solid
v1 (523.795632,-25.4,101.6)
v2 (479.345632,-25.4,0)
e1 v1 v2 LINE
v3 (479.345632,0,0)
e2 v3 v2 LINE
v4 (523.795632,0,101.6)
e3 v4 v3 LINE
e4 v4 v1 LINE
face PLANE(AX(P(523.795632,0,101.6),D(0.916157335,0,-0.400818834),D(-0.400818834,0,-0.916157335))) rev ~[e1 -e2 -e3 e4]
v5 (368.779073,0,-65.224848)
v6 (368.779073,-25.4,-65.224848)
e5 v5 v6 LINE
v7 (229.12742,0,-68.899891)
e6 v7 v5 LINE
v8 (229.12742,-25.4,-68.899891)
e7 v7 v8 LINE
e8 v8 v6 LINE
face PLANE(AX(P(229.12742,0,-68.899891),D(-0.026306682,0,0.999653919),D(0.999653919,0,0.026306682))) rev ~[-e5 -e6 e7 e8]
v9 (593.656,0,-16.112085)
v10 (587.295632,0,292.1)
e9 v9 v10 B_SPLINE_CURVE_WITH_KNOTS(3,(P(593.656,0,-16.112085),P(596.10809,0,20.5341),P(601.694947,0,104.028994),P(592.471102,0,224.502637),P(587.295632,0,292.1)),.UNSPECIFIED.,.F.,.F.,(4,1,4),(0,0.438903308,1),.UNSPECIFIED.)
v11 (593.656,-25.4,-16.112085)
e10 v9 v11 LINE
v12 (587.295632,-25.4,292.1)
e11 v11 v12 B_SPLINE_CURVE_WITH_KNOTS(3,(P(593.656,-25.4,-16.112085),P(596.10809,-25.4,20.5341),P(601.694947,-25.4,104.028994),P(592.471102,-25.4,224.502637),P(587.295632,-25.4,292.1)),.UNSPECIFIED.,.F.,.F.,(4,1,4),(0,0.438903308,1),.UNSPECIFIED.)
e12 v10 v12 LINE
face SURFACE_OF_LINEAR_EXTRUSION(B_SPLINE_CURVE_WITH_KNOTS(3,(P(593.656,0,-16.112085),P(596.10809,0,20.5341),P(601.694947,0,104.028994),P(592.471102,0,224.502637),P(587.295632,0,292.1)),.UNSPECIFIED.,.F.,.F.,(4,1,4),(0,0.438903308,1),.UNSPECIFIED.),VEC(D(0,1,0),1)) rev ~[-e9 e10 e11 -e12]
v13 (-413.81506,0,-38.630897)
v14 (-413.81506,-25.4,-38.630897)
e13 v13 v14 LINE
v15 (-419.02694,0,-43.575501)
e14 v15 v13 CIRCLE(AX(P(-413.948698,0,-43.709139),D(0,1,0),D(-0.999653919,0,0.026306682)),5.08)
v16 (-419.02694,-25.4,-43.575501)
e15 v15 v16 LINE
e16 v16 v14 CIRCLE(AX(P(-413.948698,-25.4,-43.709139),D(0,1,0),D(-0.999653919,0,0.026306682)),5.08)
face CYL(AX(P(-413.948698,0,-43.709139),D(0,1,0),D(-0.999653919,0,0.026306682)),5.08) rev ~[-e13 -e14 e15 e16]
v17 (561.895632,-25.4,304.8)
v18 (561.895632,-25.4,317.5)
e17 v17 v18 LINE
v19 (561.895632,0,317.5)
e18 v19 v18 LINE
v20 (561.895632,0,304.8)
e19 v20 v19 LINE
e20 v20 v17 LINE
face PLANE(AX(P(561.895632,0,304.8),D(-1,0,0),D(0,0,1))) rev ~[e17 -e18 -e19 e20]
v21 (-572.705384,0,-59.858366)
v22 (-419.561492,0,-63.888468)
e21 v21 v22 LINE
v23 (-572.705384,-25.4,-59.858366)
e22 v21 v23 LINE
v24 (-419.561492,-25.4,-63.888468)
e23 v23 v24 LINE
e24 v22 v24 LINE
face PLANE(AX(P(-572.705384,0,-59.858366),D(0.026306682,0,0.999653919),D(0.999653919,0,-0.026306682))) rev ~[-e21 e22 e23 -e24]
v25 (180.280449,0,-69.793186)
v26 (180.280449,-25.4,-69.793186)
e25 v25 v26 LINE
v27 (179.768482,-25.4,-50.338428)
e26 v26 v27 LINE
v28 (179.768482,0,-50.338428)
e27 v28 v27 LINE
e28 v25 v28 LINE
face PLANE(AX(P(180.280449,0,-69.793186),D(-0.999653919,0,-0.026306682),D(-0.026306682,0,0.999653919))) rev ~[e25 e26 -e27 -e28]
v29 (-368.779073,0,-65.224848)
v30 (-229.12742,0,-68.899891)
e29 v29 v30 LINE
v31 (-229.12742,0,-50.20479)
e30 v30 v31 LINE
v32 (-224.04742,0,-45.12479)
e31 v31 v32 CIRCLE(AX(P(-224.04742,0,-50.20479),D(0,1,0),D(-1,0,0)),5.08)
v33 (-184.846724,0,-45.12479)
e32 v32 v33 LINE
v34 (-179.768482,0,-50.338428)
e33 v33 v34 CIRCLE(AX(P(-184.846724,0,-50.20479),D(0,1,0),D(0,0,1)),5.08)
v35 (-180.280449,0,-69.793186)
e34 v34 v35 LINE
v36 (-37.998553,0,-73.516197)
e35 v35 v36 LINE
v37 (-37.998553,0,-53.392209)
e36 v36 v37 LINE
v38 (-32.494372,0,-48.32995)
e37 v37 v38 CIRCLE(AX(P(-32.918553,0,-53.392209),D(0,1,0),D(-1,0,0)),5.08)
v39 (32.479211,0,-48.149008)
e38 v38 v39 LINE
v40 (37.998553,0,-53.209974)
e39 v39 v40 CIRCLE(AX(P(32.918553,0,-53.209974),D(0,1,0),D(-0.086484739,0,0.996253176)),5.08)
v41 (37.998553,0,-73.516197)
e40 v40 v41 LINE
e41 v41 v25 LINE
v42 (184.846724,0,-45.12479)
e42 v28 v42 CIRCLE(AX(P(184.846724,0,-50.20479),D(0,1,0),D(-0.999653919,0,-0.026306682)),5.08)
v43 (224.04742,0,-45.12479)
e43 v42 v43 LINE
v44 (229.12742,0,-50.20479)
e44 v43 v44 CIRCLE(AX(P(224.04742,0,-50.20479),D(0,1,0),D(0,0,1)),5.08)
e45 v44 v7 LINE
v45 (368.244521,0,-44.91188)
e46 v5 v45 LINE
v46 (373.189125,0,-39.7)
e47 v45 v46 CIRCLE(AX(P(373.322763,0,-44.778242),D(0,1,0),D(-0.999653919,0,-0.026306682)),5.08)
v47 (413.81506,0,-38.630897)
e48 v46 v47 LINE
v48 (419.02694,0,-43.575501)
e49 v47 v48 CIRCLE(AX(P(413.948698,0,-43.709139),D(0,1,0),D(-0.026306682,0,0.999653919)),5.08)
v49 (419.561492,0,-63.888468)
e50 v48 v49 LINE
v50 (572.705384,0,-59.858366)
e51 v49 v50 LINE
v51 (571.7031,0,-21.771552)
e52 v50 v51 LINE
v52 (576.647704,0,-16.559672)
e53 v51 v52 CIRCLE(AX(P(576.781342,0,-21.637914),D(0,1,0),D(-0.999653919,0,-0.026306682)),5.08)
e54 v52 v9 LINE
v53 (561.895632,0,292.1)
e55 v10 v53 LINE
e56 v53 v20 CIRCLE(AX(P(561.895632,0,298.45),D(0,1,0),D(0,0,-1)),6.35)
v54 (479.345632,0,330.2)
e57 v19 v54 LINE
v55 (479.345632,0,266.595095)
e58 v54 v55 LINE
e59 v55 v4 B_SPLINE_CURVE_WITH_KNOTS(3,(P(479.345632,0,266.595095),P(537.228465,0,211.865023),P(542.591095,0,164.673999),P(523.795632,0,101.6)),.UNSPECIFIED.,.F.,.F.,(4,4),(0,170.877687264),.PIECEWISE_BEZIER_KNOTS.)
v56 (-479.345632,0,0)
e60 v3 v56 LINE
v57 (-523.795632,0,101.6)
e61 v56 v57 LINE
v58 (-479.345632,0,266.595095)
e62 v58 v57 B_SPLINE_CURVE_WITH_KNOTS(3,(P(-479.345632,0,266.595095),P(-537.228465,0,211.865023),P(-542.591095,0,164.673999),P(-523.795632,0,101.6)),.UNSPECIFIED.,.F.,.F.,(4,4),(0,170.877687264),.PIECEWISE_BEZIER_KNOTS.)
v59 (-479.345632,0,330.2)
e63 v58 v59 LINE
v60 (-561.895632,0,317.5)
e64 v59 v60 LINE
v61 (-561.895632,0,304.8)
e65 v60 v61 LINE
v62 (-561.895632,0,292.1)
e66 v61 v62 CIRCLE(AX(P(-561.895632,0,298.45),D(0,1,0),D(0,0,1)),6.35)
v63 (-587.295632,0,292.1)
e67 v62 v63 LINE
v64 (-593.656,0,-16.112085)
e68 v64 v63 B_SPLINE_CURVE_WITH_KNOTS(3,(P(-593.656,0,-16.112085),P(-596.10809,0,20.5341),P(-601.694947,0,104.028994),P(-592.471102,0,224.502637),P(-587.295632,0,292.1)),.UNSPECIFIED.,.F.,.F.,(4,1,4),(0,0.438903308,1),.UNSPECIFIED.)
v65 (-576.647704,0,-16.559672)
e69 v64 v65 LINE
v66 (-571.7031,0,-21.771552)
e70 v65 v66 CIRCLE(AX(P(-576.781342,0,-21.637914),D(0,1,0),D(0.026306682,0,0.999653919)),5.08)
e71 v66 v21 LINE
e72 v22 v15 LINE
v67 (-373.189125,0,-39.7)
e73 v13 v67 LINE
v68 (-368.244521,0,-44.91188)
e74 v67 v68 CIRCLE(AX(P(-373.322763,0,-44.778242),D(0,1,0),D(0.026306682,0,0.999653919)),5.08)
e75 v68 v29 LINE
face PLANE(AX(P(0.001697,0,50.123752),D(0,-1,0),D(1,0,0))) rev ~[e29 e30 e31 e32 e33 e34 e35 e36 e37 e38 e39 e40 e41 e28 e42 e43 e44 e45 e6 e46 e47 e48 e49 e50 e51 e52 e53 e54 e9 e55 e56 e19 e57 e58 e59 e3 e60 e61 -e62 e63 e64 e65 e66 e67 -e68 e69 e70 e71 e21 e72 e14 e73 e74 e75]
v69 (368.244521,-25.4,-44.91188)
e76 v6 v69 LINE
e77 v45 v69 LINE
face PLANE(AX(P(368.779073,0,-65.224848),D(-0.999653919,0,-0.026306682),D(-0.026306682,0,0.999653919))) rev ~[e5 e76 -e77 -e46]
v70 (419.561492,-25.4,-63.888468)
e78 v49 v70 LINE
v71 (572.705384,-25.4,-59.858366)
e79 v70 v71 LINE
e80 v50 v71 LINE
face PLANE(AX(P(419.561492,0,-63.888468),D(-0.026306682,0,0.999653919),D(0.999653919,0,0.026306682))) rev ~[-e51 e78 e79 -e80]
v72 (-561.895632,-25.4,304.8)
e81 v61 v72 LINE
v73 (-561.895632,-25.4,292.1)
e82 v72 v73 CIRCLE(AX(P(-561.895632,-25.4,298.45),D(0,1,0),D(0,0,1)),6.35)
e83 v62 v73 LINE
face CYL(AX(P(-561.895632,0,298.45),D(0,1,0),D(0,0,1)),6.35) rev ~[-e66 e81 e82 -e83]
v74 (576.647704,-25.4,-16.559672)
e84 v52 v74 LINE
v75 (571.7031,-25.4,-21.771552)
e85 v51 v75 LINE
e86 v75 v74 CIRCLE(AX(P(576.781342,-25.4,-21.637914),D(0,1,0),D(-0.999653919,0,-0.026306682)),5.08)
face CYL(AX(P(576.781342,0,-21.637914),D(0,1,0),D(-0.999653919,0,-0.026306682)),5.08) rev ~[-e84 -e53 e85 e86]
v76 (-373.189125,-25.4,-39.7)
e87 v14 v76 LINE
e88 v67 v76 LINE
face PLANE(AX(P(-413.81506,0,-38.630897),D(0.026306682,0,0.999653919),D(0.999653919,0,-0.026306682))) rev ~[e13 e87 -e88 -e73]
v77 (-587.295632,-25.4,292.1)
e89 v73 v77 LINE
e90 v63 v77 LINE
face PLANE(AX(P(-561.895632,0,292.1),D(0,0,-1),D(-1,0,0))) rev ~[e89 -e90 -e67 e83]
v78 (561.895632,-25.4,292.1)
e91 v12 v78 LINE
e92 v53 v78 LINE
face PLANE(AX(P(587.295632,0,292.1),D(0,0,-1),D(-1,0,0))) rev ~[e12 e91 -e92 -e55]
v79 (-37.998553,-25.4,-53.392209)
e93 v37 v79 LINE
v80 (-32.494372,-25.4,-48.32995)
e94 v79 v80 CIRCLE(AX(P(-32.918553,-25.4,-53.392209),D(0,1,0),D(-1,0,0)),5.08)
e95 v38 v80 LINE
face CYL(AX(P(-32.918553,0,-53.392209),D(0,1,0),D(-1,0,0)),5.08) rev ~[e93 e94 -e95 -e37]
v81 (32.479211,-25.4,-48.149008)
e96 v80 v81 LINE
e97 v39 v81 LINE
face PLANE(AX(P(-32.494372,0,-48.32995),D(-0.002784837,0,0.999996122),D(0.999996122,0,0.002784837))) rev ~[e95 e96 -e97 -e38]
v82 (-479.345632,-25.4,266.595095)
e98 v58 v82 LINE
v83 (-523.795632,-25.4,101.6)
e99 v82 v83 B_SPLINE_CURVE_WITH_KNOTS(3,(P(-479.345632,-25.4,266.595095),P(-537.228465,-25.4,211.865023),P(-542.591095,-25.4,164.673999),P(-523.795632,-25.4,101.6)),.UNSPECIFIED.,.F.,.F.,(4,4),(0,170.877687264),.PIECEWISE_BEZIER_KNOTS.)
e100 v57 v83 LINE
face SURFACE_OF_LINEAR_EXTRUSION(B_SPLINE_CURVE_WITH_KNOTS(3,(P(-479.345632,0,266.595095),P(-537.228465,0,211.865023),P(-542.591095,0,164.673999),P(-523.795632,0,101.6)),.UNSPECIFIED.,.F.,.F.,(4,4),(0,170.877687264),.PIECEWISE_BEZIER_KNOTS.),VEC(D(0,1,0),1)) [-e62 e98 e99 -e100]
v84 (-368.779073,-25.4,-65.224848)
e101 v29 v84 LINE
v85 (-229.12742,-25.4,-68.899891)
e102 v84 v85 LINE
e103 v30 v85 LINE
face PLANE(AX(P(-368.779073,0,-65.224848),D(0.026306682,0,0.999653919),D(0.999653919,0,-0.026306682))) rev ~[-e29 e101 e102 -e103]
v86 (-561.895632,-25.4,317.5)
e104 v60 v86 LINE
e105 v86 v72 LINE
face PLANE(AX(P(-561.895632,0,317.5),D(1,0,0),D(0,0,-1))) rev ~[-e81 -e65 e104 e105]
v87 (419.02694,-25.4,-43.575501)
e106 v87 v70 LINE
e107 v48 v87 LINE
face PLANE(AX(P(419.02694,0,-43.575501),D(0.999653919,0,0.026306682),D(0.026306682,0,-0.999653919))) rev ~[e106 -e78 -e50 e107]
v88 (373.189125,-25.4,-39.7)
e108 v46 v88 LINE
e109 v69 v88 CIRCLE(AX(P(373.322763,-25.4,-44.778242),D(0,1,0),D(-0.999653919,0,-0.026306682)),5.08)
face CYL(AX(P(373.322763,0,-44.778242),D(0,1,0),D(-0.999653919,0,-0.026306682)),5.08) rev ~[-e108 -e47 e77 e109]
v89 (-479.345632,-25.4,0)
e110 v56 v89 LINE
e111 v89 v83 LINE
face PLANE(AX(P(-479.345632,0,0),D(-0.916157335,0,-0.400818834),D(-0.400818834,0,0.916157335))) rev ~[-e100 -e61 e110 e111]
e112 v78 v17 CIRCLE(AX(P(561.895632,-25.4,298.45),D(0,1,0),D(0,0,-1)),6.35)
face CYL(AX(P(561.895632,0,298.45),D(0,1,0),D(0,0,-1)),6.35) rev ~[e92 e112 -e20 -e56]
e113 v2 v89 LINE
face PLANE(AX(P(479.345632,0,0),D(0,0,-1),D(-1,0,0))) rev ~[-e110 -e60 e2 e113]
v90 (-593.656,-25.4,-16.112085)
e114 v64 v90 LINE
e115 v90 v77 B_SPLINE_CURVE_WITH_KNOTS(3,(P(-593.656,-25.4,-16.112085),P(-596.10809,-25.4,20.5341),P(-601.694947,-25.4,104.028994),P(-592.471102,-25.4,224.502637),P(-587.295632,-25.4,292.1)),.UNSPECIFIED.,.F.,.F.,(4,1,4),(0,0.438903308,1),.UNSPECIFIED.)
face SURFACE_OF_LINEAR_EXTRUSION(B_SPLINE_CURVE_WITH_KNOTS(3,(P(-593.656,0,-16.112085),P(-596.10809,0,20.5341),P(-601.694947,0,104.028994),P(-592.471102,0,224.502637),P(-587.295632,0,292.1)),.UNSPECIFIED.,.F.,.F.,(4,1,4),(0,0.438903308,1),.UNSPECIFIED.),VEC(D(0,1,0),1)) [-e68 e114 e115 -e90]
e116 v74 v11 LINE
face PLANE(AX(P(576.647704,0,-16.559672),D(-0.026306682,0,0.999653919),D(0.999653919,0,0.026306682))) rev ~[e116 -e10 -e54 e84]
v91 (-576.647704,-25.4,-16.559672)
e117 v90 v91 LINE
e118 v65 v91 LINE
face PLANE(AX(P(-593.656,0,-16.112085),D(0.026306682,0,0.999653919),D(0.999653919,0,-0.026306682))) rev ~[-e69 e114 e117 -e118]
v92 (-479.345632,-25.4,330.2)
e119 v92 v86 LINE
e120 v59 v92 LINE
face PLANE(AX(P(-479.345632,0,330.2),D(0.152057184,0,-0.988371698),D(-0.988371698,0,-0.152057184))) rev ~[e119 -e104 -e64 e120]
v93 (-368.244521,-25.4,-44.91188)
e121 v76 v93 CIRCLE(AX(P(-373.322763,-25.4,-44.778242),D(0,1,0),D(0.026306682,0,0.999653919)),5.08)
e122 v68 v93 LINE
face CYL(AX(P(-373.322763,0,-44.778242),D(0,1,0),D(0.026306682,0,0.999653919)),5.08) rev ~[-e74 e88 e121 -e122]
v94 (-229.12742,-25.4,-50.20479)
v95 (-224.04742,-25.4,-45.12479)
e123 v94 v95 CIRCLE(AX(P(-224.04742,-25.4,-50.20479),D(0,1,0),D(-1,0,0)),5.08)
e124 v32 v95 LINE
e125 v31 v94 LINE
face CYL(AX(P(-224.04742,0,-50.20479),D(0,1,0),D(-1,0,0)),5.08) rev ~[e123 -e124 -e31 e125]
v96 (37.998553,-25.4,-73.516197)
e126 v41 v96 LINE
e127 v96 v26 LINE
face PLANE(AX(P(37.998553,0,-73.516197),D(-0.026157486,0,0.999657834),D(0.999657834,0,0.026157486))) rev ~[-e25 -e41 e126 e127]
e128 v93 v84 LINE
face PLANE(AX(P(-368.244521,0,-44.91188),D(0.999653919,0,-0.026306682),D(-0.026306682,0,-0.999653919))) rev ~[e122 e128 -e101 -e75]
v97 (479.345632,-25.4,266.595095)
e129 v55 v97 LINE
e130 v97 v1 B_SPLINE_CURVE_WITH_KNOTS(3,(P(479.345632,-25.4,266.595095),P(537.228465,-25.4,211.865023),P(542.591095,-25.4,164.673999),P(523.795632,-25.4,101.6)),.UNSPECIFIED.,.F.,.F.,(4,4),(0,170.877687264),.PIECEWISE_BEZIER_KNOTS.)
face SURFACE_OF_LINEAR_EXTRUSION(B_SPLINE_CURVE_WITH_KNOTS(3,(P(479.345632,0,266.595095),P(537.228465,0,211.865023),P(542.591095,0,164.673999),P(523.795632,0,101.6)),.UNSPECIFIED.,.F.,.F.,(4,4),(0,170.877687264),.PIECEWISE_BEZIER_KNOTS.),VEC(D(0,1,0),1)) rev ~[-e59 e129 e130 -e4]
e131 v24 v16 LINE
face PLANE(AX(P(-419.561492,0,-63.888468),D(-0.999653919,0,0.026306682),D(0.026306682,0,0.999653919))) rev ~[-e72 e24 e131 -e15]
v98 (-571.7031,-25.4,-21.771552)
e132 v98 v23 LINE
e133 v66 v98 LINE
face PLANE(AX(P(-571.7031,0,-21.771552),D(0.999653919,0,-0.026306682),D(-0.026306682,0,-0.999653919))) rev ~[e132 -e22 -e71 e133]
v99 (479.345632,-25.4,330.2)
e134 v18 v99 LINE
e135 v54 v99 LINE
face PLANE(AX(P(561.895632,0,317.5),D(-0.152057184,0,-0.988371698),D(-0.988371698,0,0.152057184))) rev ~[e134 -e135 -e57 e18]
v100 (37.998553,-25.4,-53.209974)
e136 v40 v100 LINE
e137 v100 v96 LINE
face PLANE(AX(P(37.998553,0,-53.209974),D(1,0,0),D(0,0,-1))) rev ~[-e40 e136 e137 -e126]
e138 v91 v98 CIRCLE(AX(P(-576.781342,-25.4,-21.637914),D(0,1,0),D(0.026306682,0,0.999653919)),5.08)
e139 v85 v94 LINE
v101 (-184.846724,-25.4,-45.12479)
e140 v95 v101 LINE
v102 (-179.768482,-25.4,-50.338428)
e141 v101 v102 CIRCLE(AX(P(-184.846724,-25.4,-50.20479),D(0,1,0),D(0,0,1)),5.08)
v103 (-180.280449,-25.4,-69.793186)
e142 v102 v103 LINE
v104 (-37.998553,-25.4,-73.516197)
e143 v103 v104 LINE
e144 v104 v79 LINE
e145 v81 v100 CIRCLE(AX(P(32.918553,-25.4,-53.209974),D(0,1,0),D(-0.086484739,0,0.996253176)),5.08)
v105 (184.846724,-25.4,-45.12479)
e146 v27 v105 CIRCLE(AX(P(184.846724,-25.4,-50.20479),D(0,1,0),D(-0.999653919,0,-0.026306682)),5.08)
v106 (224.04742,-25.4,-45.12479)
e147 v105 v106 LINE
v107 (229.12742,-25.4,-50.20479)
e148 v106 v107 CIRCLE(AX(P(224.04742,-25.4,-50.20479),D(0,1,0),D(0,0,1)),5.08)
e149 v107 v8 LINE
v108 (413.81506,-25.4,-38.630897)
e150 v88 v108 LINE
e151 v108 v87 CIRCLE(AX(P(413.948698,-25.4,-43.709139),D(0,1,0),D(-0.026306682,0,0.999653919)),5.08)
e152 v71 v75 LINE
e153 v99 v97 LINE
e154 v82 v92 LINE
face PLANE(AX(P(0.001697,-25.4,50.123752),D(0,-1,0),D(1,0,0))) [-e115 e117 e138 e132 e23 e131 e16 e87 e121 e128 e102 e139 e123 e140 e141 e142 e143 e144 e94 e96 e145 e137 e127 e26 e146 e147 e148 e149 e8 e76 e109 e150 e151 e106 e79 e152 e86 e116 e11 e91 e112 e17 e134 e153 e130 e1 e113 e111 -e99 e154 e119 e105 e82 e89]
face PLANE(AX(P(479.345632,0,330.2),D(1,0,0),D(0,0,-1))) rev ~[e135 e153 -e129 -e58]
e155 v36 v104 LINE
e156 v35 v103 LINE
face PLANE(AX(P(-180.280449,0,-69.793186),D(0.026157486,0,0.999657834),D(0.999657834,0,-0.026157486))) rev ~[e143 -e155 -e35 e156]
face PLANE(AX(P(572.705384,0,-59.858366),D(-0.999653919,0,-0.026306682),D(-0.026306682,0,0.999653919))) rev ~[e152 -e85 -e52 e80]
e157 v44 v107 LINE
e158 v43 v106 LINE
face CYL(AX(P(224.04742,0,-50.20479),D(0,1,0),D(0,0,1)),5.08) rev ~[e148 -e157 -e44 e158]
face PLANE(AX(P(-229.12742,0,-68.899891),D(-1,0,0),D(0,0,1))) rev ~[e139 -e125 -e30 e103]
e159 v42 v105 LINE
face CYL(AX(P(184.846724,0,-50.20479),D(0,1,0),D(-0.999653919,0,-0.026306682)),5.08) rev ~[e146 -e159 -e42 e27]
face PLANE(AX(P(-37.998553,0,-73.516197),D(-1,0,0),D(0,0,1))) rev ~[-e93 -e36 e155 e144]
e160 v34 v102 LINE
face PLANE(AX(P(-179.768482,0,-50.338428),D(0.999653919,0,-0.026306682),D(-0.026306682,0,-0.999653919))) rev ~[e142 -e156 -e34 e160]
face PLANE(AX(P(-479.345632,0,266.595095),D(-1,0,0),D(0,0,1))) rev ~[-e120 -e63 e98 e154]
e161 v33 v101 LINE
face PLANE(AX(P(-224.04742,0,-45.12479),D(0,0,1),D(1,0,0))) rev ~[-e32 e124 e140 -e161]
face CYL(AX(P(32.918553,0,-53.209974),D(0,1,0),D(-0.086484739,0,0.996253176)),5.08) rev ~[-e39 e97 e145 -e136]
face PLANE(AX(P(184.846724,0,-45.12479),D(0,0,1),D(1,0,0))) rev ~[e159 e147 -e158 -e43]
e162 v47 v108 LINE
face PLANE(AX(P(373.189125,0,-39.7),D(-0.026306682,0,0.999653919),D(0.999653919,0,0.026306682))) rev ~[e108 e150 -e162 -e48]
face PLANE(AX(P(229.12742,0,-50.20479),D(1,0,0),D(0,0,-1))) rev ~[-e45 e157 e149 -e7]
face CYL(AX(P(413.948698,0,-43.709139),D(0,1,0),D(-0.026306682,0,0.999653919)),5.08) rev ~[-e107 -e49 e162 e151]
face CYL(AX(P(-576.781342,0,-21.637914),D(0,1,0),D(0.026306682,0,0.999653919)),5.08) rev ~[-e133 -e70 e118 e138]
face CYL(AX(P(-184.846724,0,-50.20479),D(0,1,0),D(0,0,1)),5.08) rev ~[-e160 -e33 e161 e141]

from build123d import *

# Parameters (mm, degrees)
F1_DEPTH = 25.4


with BuildPart() as f1:
    # F0 (on Front) → F1 (new body)
    with BuildSketch(Plane.XZ):
        with BuildLine():
            Line((-180.280449281, -69.793186067), (-37.9985533655, -73.516196597))
            Line((-37.9985533655, -73.516196597), (-37.9985533655, -53.3922091126))
            ThreePointArc((-37.9985533655, -53.3922091126), (-36.3574166334, -49.6531424612), (-32.4943724898, -48.3299496779))
            Line((-32.4943724898, -48.3299496779), (32.4792108915, -48.1490081299))
            ThreePointArc((32.4792108915, -48.1490081299), (36.3518127667, -49.4657614096), (37.9985533655, -53.209974262))
            Line((37.9985533655, -53.209974262), (37.9985533655, -73.516196597))
            Line((37.9985533655, -73.516196597), (180.280449281, -69.793186067))
            Line((180.280449281, -69.793186067), (179.7684819711, -50.3384282921))
            ThreePointArc((179.7684819711, -50.3384282921), (181.2076799987, -46.6602509384), (184.8467238815, -45.124790347))
            Line((184.8467238815, -45.124790347), (224.0474202454, -45.124790347))
            ThreePointArc((224.0474202454, -45.124790347), (227.6395226938, -46.6126878986), (229.1274202454, -50.204790347))
            Line((229.1274202454, -50.204790347), (229.1274202454, -68.8998913716))
            Line((229.1274202454, -68.8998913716), (368.779072779, -65.2248478839))
            Line((368.779072779, -65.2248478839), (368.2445209989, -44.9118802426))
            ThreePointArc((368.2445209989, -44.9118802426), (369.6374073208, -41.2818793035), (373.1891249642, -39.7000003873))
            Line((373.1891249642, -39.7000003873), (413.8150602467, -38.6308968272))
            ThreePointArc((413.8150602467, -38.6308968272), (417.4450611859, -40.0237831491), (419.0269401021, -43.5755007925))
            Line((419.0269401021, -43.5755007925), (419.5614918821, -63.8884684338))
            Line((419.5614918821, -63.8884684338), (572.7053844218, -59.8583659985))
            Line((572.7053844218, -59.8583659985), (571.7030998342, -21.7715516712))
            ThreePointArc((571.7030998342, -21.7715516712), (573.0959861561, -18.141550732), (576.6477037995, -16.5596718159))
            Line((576.6477037995, -16.5596718159), (593.6560001815, -16.112085069))
            add(Edge.make_bspline(
                [(593.6560001815, -16.112085069), (596.1080901801, 20.5341002257), (601.6949471336, 104.0289944805), (592.471101525, 224.502637459), (587.295632267, 292.1)],
                knots=[0, 0, 0, 0, 0.4389033081, 1, 1, 1, 1], degree=3))
            Line((587.295632267, 292.1), (561.895632267, 292.1))
            ThreePointArc((561.895632267, 292.1), (555.545632267, 298.45), (561.895632267, 304.8))
            Line((561.895632267, 304.8), (561.895632267, 317.5))
            Line((561.895632267, 317.5), (479.345632267, 330.2))
            Line((479.345632267, 330.2), (479.345632267, 266.595095396))
            add(Edge.make_bspline(
                [(479.345632267, 266.595095396), (537.2284650803, 211.8650227785), (542.5910949707, 164.6739989519), (523.795632267, 101.6)],
                knots=[0, 0, 0, 0, 170.8776872642, 170.8776872642, 170.8776872642, 170.8776872642], degree=3))
            Line((523.795632267, 101.6), (479.345632267, 0))
            Line((479.345632267, 0), (0, 0))
            Line((0, 0), (-479.345632267, 0))
            Line((-479.345632267, 0), (-523.795632267, 101.6))
            add(Edge.make_bspline(
                [(-479.345632267, 266.595095396), (-537.2284650803, 211.8650227785), (-542.5910949707, 164.6739989519), (-523.795632267, 101.6)],
                knots=[0, 0, 0, 0, 170.8776872642, 170.8776872642, 170.8776872642, 170.8776872642], degree=3))
            Line((-479.345632267, 266.595095396), (-479.345632267, 330.2))
            Line((-479.345632267, 330.2), (-561.895632267, 317.5))
            Line((-561.895632267, 317.5), (-561.895632267, 304.8))
            ThreePointArc((-561.895632267, 304.8), (-555.545632267, 298.45), (-561.895632267, 292.1))
            Line((-561.895632267, 292.1), (-587.295632267, 292.1))
            add(Edge.make_bspline(
                [(-593.6560001815, -16.112085069), (-596.1080901801, 20.5341002257), (-601.6949471336, 104.0289944805), (-592.471101525, 224.502637459), (-587.295632267, 292.1)],
                knots=[0, 0, 0, 0, 0.4389033081, 1, 1, 1, 1], degree=3))
            Line((-593.6560001815, -16.112085069), (-576.6477037995, -16.5596718159))
            ThreePointArc((-576.6477037995, -16.5596718159), (-573.0959861561, -18.141550732), (-571.7030998342, -21.7715516712))
            Line((-571.7030998342, -21.7715516712), (-572.7053844218, -59.8583659985))
            Line((-572.7053844218, -59.8583659985), (-419.5614918821, -63.8884684338))
            Line((-419.5614918821, -63.8884684338), (-419.0269401021, -43.5755007925))
            ThreePointArc((-419.0269401021, -43.5755007925), (-417.4450611859, -40.0237831491), (-413.8150602467, -38.6308968272))
            Line((-413.8150602467, -38.6308968272), (-373.1891249642, -39.7000003873))
            ThreePointArc((-373.1891249642, -39.7000003873), (-369.6374073208, -41.2818793035), (-368.2445209989, -44.9118802426))
            Line((-368.2445209989, -44.9118802426), (-368.779072779, -65.2248478839))
            Line((-368.779072779, -65.2248478839), (-229.1274202454, -68.8998913716))
            Line((-229.1274202454, -68.8998913716), (-229.1274202454, -50.204790347))
            ThreePointArc((-229.1274202454, -50.204790347), (-227.6395226938, -46.6126878986), (-224.0474202454, -45.124790347))
            Line((-224.0474202454, -45.124790347), (-184.8467238815, -45.124790347))
            ThreePointArc((-184.8467238815, -45.124790347), (-181.2076799987, -46.6602509384), (-179.7684819711, -50.3384282921))
            Line((-179.7684819711, -50.3384282921), (-180.280449281, -69.793186067))
        make_face()
    extrude(amount=F1_DEPTH)


solid = f1.part
